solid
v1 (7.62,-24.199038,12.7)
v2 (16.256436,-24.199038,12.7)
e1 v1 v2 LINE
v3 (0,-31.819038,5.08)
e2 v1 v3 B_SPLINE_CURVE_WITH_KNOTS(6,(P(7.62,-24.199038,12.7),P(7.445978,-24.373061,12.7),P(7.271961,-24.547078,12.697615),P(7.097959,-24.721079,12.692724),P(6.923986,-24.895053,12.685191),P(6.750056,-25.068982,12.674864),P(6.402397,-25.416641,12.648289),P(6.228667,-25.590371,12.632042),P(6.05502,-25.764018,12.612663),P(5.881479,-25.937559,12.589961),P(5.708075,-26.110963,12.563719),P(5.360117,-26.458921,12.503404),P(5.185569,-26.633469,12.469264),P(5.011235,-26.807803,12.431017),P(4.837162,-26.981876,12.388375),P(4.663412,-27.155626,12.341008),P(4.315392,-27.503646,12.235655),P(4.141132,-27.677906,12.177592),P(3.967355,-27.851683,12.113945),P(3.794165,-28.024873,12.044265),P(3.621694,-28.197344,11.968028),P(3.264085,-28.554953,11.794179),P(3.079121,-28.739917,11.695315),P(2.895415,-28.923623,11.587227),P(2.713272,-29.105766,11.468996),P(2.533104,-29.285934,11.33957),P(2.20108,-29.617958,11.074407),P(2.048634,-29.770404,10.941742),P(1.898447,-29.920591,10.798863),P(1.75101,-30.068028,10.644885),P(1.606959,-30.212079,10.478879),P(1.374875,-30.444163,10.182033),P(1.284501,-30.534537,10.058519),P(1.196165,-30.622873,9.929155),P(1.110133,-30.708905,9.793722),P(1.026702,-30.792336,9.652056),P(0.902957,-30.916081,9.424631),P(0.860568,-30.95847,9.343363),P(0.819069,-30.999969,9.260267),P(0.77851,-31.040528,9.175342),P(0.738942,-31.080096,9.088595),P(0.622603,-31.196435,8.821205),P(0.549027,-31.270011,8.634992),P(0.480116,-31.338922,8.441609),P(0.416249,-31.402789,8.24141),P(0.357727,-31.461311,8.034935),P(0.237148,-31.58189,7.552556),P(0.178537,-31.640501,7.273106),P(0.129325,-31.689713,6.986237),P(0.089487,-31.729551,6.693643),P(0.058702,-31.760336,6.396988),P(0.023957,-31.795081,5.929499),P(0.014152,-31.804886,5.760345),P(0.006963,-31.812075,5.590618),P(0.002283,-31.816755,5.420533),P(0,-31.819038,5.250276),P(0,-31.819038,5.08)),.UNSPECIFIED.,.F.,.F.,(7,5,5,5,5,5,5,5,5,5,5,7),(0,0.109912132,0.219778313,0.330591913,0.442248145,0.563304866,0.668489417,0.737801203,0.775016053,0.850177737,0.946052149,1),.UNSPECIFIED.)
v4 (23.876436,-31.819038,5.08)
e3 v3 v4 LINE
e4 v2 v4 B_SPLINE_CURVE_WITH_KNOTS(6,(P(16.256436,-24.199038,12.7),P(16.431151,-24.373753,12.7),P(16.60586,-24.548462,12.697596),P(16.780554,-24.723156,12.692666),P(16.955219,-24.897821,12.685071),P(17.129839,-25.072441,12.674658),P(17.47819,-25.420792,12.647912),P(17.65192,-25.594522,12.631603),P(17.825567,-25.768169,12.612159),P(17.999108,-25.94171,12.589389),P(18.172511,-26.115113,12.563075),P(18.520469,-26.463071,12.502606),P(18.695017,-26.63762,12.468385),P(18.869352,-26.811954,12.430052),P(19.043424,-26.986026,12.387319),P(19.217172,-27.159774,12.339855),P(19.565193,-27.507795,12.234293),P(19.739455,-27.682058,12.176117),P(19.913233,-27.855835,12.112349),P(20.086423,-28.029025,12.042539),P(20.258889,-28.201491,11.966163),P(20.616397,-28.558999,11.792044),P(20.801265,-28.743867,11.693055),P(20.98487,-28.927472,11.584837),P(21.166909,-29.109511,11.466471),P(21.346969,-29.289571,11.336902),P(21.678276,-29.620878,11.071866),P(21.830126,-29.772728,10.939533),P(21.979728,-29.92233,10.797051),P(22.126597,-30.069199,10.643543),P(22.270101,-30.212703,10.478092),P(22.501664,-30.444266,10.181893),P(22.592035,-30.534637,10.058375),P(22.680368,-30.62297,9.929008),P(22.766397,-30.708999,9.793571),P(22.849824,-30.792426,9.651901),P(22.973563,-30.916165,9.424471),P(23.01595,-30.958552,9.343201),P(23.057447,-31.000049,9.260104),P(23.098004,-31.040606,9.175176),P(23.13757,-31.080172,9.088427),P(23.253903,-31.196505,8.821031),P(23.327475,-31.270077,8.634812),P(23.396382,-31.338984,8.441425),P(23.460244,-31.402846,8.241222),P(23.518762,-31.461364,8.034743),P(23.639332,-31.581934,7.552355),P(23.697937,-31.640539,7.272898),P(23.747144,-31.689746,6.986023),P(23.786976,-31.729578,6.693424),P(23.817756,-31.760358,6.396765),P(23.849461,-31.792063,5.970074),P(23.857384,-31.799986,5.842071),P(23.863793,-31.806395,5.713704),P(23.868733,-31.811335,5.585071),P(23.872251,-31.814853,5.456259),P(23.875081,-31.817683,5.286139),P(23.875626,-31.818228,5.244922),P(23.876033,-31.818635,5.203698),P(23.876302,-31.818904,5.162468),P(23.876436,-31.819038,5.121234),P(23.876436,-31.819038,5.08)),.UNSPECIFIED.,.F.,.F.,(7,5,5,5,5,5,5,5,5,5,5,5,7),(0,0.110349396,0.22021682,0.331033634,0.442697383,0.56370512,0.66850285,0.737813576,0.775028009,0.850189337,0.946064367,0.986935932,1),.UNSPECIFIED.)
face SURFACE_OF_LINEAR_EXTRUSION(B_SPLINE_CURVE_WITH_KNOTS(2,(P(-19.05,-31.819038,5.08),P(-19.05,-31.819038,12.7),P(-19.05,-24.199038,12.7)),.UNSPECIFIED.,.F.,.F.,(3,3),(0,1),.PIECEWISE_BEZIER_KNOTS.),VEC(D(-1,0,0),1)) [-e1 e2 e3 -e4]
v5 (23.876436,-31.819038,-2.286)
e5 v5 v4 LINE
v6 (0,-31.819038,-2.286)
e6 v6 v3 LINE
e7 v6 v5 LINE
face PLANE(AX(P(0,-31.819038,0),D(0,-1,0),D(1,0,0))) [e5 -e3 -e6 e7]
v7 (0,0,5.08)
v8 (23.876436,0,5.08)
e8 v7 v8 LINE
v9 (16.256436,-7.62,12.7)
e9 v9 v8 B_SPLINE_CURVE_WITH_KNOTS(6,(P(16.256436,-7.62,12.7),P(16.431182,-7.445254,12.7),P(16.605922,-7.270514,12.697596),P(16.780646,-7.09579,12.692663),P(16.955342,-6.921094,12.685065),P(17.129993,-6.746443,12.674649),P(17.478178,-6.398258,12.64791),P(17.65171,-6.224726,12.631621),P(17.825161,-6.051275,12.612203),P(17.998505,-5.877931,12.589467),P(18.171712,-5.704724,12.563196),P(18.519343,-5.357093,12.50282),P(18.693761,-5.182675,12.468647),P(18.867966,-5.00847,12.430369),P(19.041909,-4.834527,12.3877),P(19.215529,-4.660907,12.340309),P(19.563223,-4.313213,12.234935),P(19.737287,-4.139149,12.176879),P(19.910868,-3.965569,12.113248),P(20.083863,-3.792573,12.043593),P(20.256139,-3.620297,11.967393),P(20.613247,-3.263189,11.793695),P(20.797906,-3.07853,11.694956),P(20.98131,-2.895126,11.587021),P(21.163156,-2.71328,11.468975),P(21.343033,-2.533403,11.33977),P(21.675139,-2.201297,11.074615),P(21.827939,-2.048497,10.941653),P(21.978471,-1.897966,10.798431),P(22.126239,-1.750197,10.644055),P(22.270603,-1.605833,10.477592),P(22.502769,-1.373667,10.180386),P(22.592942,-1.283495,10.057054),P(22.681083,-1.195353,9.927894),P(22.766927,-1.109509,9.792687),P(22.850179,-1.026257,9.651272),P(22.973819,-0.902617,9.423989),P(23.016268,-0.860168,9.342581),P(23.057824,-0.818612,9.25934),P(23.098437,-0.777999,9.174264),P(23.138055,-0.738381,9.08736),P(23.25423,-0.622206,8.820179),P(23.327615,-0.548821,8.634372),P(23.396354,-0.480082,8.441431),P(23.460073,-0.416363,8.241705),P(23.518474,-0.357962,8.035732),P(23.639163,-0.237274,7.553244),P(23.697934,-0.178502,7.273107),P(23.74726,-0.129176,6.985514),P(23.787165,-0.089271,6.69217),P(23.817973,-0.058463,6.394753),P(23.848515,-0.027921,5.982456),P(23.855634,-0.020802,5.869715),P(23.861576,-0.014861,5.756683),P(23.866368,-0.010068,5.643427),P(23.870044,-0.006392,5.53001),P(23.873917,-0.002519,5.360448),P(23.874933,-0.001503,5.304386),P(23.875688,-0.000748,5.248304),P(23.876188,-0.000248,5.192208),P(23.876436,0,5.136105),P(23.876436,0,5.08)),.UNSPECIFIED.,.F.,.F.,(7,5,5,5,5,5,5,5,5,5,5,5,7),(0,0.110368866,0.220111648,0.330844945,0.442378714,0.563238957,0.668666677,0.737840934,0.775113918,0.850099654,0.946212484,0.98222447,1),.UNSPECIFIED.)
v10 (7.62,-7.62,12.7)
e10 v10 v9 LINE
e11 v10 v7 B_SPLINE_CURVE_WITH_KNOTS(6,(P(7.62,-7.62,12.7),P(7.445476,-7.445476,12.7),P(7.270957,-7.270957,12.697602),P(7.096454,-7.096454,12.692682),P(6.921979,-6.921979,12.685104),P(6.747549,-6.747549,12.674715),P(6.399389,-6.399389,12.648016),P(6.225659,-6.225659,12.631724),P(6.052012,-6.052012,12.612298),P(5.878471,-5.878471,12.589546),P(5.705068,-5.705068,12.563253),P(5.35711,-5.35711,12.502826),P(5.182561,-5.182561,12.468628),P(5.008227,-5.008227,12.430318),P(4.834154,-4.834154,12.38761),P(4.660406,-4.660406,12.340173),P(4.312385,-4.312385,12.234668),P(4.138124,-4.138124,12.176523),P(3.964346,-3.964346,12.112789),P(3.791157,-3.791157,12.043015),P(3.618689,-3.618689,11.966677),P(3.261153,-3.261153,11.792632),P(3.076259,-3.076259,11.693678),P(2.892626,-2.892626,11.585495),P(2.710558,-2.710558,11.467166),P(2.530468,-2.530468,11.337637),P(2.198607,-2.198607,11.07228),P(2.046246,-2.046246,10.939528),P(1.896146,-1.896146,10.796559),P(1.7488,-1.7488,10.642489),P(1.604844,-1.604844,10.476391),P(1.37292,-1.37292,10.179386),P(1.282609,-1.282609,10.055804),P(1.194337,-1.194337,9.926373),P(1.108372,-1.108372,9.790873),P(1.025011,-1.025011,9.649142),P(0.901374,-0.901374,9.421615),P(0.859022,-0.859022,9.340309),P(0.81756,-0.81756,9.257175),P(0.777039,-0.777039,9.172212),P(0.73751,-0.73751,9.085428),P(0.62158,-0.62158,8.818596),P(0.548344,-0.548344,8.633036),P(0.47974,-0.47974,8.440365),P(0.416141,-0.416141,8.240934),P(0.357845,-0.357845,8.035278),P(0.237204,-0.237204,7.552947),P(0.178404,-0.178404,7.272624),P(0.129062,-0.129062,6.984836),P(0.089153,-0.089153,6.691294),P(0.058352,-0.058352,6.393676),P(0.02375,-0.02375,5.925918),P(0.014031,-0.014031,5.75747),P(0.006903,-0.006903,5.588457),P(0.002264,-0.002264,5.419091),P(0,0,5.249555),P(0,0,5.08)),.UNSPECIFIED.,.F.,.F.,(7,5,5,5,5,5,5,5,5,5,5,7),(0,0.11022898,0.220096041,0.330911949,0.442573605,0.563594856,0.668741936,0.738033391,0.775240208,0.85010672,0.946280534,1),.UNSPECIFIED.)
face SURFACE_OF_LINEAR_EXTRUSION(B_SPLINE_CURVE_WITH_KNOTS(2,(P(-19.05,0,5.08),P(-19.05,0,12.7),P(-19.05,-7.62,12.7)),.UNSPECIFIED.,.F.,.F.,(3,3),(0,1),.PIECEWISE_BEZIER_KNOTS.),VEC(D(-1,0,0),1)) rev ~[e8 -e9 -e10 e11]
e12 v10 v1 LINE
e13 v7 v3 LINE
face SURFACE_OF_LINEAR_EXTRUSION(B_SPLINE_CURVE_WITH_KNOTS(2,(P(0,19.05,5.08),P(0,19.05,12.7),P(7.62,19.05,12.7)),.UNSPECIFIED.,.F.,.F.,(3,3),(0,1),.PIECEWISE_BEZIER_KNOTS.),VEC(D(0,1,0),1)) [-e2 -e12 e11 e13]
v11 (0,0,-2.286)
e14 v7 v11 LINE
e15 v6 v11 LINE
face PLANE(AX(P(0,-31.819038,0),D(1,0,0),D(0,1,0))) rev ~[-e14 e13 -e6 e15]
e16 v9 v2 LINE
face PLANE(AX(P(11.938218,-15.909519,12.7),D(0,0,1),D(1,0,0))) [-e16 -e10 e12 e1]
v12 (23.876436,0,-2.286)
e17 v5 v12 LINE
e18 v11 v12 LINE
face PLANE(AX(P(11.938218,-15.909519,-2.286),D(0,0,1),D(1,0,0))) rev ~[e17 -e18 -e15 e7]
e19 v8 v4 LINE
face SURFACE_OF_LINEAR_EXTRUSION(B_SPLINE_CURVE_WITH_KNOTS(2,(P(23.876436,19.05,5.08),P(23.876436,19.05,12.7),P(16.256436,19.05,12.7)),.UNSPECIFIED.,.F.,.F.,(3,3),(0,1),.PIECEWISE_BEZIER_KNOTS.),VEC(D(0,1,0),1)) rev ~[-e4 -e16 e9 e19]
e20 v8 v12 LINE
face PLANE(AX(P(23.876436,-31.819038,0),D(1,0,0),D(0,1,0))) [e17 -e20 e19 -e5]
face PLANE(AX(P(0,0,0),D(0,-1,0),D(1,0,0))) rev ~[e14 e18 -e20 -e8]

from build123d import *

# Parameters (mm, degrees)
F0_W        = 23.8764360547
F0_H        = 31.8190380931
F3_DEPTH    = 12.7
F1_T1_DEPTH = 69.9190380931
F1_T3_DEPTH = 61.9764360547
F2_DEPTH    = 2.286


# Not quite as in the source:
# - a fillet or chamfer that OpenCascade refuses, or shapes differently, is made with other operations: its cross-section is extruded or revolved along the edge and cut away or added


with BuildPart() as f3:
    # F0 (on Top) → F3 (new body)
    with BuildSketch(Plane.XY):
        with Locations((11.9382180274, -15.9095190465)):
            Rectangle(F0_W, F0_H)
    extrude(amount=F3_DEPTH)

    # F1: fillet of radius 7.62 on 4 edges, made by hand

    # F1_s2 → F1_t1 (cut)
    with BuildSketch(Plane.XZ.offset(-19.05)):
        with BuildLine():
            add(Edge.make_bspline(
                [(23.8764360547, 5.08), (23.8764360547, 12.7), (16.2564360547, 12.7)],
                knots=[0, 0, 0, 1, 1, 1], degree=2, weights=[1, 1, 1]))
            Line((16.2564360547, 12.7), (23.8764360547, 12.7))
            Line((23.8764360547, 12.7), (23.8764360547, 5.08))
        make_face()
        with BuildLine():
            add(Edge.make_bspline(
                [(0, 5.08), (0, 12.7), (7.62, 12.7)],
                knots=[0, 0, 0, 1, 1, 1], degree=2, weights=[1, 1, 1]))
            Line((7.62, 12.7), (0, 12.7))
            Line((0, 12.7), (0, 5.08))
        make_face()
    extrude(amount=F1_T1_DEPTH, mode=Mode.SUBTRACT)

    # F1_s4 → F1_t3 (cut)
    with BuildSketch(Plane.YZ.offset(-19.05)):
        with BuildLine():
            add(Edge.make_bspline(
                [(0, 5.08), (0, 12.7), (-7.62, 12.7)],
                knots=[0, 0, 0, 1, 1, 1], degree=2, weights=[1, 1, 1]))
            Line((-7.62, 12.7), (0, 12.7))
            Line((0, 12.7), (0, 5.08))
        make_face()
        with BuildLine():
            add(Edge.make_bspline(
                [(-31.8190380931, 5.08), (-31.8190380931, 12.7), (-24.1990380931, 12.7)],
                knots=[0, 0, 0, 1, 1, 1], degree=2, weights=[1, 1, 1]))
            Line((-24.1990380931, 12.7), (-31.8190380931, 12.7))
            Line((-31.8190380931, 12.7), (-31.8190380931, 5.08))
        make_face()
    extrude(amount=F1_T3_DEPTH, mode=Mode.SUBTRACT)

    # F2 (add): a face of the model
    f2_faces = [f3.faces().sort_by_distance(p)[0] for p in [
        (11.9382180274, -15.9095190465, 0),
    ]]
    extrude(f2_faces, amount=F2_DEPTH)


solid = f3.part
